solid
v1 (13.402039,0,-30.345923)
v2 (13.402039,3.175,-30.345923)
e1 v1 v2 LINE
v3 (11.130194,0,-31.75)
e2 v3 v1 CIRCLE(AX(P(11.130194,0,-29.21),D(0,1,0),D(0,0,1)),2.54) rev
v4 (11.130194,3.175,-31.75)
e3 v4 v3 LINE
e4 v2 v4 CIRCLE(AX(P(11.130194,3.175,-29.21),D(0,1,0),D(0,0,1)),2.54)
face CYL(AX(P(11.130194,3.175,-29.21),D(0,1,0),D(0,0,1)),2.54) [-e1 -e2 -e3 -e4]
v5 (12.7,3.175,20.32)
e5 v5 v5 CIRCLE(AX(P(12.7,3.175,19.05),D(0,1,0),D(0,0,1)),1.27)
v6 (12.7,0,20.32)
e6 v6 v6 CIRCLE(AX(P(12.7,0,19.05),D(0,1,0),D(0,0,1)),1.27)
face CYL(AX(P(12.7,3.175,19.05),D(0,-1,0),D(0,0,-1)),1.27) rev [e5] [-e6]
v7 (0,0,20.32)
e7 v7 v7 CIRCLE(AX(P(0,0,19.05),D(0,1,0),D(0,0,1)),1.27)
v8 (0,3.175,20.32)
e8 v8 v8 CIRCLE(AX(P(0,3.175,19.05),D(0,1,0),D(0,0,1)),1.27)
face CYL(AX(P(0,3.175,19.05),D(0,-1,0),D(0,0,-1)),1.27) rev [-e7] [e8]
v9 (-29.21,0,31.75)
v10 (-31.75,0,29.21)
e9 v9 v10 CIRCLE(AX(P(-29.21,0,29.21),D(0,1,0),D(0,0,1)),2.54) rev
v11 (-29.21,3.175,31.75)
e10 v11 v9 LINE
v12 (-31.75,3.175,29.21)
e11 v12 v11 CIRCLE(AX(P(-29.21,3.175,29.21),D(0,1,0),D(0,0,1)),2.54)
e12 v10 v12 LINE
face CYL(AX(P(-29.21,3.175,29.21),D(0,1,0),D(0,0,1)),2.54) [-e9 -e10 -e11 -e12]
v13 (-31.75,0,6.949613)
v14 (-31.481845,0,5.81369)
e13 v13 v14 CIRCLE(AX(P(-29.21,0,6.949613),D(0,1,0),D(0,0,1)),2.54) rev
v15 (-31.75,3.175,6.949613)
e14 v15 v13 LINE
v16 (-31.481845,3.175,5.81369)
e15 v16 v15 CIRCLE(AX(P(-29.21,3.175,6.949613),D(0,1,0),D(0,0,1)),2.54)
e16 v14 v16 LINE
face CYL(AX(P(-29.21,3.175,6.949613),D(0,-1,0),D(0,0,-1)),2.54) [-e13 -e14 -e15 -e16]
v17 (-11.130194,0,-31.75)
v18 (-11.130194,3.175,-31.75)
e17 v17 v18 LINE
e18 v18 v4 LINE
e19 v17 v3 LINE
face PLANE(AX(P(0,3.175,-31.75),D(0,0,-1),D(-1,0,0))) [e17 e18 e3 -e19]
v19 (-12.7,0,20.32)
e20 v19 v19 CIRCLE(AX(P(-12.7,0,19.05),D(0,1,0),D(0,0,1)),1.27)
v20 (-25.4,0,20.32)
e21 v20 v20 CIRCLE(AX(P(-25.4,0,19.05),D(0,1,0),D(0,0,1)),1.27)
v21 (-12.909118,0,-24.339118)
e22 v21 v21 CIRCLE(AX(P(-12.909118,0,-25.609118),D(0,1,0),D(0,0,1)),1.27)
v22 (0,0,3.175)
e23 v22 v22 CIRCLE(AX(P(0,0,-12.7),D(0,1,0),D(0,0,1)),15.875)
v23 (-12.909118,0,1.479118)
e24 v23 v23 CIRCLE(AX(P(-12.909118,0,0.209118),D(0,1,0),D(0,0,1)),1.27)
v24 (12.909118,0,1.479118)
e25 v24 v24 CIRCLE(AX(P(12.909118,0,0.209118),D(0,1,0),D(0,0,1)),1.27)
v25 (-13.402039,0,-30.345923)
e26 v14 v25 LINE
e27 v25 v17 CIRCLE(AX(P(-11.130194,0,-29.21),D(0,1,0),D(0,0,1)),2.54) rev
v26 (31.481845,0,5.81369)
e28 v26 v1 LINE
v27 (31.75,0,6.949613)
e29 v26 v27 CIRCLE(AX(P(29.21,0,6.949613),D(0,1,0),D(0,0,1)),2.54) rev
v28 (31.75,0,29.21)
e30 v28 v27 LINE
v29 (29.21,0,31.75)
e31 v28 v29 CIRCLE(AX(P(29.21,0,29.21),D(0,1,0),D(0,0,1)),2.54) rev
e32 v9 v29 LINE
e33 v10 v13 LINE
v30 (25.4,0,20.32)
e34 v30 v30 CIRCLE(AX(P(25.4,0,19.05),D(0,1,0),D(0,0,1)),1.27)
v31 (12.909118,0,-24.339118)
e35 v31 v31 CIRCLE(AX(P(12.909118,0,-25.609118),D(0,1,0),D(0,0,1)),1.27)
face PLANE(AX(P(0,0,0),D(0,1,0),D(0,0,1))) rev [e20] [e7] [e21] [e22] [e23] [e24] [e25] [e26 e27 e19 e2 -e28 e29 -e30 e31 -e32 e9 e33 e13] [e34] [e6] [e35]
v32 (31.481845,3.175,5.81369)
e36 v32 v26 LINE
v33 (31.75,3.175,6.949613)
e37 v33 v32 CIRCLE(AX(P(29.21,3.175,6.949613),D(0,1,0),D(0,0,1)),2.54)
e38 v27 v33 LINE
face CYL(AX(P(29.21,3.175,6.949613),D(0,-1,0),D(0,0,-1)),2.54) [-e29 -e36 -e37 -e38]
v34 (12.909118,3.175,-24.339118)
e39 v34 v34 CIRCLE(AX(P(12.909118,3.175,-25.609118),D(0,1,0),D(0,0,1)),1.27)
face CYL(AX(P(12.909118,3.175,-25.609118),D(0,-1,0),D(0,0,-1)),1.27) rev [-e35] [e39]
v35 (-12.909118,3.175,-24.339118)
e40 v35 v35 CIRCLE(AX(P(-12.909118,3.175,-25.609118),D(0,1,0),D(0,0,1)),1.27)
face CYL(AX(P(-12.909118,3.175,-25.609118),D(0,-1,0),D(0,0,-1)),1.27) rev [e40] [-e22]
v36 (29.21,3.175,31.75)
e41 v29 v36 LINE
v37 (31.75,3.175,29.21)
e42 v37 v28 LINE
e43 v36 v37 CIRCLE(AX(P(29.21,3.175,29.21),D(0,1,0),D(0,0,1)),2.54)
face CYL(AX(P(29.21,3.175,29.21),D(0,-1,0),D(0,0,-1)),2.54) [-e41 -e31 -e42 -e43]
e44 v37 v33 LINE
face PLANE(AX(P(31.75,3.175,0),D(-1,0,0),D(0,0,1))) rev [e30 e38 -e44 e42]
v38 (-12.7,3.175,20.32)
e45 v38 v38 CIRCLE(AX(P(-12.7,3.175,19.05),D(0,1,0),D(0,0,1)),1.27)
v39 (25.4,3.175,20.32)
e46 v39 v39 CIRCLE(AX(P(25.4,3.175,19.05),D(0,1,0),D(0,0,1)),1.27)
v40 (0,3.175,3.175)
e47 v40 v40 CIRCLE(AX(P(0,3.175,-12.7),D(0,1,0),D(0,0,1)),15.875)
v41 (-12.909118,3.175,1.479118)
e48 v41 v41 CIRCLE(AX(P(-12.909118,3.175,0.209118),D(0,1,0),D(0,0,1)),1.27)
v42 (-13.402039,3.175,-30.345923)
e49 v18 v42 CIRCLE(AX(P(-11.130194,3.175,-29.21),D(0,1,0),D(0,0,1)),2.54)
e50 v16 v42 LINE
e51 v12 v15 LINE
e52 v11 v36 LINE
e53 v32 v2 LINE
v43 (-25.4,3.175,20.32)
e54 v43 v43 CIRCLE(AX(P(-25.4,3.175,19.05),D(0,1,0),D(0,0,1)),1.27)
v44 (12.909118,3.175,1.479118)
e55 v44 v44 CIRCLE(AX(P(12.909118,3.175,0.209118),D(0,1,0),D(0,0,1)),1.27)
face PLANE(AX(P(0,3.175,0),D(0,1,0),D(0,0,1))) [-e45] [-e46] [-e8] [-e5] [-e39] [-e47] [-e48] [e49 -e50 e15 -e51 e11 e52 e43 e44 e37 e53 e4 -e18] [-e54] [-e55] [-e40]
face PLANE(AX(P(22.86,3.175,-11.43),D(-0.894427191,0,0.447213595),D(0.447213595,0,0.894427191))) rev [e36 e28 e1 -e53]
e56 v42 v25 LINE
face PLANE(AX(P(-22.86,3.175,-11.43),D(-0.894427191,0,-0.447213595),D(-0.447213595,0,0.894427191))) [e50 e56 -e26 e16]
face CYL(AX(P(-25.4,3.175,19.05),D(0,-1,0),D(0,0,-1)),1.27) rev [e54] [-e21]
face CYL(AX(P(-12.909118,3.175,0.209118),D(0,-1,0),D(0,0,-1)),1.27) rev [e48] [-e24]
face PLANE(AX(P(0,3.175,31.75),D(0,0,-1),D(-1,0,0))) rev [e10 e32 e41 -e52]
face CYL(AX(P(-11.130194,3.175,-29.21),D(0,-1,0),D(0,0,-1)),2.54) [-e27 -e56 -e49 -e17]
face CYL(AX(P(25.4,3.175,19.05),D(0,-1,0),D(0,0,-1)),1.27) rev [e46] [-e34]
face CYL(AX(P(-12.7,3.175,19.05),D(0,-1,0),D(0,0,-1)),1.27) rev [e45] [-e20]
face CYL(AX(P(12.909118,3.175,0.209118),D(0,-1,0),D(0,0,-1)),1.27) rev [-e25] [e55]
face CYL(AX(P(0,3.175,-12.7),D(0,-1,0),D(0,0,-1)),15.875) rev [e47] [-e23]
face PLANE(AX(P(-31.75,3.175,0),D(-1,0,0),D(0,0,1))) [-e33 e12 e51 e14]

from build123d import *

# Parameters (mm, degrees)
SKETCH1_R             = 15.875
SKETCH1_R_2           = 1.27
INITIAL_BRACKET_DEPTH = 3.175
EDGE_FILLET_R         = 2.54
LPATTERN1_OUTLINE_R   = 1.27
LPATTERN1_DEPTH       = 3.175


# Read off the part's stored shape, not the designer's step: LPattern1
with BuildPart() as part:
    # Sketch1 → Initial Bracket (new body)
    with BuildSketch(Plane(origin=(0, 0, 0), x_dir=(1, 0, 0), z_dir=(0, 1, 0))):
        Polygon((-31.75, -31.75), (31.75, -31.75), (31.75, -6.35), (12.7, 31.75), (-12.7, 31.75), (-31.75, -6.35), align=None)
        with Locations(Location((0, 12.7, 0), (0, 0, 270))):
            Circle(SKETCH1_R, mode=Mode.SUBTRACT)
        with Locations(Location((12.909118174, 25.609118174, 0), (0, 0, 270))):
            Circle(SKETCH1_R_2, mode=Mode.SUBTRACT)
        with Locations(Location((12.909118174, -0.209118174, 0), (0, 0, 270))):
            Circle(SKETCH1_R_2, mode=Mode.SUBTRACT)
        with Locations(Location((-12.909118174, -0.209118174, 0), (0, 0, 270))):
            Circle(SKETCH1_R_2, mode=Mode.SUBTRACT)
        with Locations(Location((-12.909118174, 25.609118174, 0), (0, 0, 270))):
            Circle(SKETCH1_R_2, mode=Mode.SUBTRACT)
        with Locations(Location((-25.4, -19.05, 0), (0, 0, 270))):
            Circle(SKETCH1_R_2, mode=Mode.SUBTRACT)
    extrude(amount=INITIAL_BRACKET_DEPTH)

    # Edge Fillet
    edge_fillet_edges = [part.edges().sort_by_distance(p)[0] for p in [
        (31.75, 1.5875, 31.75),
        (-31.75, 1.5875, 31.75),
        (-31.75, 1.5875, 6.35),
        (-12.7, 1.5875, -31.75),
        (12.7, 1.5875, -31.75),
        (31.75, 1.5875, 6.35),
    ]]
    fillet(edge_fillet_edges, radius=EDGE_FILLET_R)

    # LPattern1 outline → LPattern1 (cut)
    with BuildSketch(Plane(origin=(0, 0, 0), x_dir=(1, 0, 0), z_dir=(0, 1, 0))):
        with Locations((25.4, -19.05)):
            Circle(LPATTERN1_OUTLINE_R)
        with Locations((12.7, -19.05)):
            Circle(LPATTERN1_OUTLINE_R)
        with Locations((0, -19.05)):
            Circle(LPATTERN1_OUTLINE_R)
        with Locations((-12.7, -19.05)):
            Circle(LPATTERN1_OUTLINE_R)
    extrude(amount=LPATTERN1_DEPTH, mode=Mode.SUBTRACT)


solid = part.part
